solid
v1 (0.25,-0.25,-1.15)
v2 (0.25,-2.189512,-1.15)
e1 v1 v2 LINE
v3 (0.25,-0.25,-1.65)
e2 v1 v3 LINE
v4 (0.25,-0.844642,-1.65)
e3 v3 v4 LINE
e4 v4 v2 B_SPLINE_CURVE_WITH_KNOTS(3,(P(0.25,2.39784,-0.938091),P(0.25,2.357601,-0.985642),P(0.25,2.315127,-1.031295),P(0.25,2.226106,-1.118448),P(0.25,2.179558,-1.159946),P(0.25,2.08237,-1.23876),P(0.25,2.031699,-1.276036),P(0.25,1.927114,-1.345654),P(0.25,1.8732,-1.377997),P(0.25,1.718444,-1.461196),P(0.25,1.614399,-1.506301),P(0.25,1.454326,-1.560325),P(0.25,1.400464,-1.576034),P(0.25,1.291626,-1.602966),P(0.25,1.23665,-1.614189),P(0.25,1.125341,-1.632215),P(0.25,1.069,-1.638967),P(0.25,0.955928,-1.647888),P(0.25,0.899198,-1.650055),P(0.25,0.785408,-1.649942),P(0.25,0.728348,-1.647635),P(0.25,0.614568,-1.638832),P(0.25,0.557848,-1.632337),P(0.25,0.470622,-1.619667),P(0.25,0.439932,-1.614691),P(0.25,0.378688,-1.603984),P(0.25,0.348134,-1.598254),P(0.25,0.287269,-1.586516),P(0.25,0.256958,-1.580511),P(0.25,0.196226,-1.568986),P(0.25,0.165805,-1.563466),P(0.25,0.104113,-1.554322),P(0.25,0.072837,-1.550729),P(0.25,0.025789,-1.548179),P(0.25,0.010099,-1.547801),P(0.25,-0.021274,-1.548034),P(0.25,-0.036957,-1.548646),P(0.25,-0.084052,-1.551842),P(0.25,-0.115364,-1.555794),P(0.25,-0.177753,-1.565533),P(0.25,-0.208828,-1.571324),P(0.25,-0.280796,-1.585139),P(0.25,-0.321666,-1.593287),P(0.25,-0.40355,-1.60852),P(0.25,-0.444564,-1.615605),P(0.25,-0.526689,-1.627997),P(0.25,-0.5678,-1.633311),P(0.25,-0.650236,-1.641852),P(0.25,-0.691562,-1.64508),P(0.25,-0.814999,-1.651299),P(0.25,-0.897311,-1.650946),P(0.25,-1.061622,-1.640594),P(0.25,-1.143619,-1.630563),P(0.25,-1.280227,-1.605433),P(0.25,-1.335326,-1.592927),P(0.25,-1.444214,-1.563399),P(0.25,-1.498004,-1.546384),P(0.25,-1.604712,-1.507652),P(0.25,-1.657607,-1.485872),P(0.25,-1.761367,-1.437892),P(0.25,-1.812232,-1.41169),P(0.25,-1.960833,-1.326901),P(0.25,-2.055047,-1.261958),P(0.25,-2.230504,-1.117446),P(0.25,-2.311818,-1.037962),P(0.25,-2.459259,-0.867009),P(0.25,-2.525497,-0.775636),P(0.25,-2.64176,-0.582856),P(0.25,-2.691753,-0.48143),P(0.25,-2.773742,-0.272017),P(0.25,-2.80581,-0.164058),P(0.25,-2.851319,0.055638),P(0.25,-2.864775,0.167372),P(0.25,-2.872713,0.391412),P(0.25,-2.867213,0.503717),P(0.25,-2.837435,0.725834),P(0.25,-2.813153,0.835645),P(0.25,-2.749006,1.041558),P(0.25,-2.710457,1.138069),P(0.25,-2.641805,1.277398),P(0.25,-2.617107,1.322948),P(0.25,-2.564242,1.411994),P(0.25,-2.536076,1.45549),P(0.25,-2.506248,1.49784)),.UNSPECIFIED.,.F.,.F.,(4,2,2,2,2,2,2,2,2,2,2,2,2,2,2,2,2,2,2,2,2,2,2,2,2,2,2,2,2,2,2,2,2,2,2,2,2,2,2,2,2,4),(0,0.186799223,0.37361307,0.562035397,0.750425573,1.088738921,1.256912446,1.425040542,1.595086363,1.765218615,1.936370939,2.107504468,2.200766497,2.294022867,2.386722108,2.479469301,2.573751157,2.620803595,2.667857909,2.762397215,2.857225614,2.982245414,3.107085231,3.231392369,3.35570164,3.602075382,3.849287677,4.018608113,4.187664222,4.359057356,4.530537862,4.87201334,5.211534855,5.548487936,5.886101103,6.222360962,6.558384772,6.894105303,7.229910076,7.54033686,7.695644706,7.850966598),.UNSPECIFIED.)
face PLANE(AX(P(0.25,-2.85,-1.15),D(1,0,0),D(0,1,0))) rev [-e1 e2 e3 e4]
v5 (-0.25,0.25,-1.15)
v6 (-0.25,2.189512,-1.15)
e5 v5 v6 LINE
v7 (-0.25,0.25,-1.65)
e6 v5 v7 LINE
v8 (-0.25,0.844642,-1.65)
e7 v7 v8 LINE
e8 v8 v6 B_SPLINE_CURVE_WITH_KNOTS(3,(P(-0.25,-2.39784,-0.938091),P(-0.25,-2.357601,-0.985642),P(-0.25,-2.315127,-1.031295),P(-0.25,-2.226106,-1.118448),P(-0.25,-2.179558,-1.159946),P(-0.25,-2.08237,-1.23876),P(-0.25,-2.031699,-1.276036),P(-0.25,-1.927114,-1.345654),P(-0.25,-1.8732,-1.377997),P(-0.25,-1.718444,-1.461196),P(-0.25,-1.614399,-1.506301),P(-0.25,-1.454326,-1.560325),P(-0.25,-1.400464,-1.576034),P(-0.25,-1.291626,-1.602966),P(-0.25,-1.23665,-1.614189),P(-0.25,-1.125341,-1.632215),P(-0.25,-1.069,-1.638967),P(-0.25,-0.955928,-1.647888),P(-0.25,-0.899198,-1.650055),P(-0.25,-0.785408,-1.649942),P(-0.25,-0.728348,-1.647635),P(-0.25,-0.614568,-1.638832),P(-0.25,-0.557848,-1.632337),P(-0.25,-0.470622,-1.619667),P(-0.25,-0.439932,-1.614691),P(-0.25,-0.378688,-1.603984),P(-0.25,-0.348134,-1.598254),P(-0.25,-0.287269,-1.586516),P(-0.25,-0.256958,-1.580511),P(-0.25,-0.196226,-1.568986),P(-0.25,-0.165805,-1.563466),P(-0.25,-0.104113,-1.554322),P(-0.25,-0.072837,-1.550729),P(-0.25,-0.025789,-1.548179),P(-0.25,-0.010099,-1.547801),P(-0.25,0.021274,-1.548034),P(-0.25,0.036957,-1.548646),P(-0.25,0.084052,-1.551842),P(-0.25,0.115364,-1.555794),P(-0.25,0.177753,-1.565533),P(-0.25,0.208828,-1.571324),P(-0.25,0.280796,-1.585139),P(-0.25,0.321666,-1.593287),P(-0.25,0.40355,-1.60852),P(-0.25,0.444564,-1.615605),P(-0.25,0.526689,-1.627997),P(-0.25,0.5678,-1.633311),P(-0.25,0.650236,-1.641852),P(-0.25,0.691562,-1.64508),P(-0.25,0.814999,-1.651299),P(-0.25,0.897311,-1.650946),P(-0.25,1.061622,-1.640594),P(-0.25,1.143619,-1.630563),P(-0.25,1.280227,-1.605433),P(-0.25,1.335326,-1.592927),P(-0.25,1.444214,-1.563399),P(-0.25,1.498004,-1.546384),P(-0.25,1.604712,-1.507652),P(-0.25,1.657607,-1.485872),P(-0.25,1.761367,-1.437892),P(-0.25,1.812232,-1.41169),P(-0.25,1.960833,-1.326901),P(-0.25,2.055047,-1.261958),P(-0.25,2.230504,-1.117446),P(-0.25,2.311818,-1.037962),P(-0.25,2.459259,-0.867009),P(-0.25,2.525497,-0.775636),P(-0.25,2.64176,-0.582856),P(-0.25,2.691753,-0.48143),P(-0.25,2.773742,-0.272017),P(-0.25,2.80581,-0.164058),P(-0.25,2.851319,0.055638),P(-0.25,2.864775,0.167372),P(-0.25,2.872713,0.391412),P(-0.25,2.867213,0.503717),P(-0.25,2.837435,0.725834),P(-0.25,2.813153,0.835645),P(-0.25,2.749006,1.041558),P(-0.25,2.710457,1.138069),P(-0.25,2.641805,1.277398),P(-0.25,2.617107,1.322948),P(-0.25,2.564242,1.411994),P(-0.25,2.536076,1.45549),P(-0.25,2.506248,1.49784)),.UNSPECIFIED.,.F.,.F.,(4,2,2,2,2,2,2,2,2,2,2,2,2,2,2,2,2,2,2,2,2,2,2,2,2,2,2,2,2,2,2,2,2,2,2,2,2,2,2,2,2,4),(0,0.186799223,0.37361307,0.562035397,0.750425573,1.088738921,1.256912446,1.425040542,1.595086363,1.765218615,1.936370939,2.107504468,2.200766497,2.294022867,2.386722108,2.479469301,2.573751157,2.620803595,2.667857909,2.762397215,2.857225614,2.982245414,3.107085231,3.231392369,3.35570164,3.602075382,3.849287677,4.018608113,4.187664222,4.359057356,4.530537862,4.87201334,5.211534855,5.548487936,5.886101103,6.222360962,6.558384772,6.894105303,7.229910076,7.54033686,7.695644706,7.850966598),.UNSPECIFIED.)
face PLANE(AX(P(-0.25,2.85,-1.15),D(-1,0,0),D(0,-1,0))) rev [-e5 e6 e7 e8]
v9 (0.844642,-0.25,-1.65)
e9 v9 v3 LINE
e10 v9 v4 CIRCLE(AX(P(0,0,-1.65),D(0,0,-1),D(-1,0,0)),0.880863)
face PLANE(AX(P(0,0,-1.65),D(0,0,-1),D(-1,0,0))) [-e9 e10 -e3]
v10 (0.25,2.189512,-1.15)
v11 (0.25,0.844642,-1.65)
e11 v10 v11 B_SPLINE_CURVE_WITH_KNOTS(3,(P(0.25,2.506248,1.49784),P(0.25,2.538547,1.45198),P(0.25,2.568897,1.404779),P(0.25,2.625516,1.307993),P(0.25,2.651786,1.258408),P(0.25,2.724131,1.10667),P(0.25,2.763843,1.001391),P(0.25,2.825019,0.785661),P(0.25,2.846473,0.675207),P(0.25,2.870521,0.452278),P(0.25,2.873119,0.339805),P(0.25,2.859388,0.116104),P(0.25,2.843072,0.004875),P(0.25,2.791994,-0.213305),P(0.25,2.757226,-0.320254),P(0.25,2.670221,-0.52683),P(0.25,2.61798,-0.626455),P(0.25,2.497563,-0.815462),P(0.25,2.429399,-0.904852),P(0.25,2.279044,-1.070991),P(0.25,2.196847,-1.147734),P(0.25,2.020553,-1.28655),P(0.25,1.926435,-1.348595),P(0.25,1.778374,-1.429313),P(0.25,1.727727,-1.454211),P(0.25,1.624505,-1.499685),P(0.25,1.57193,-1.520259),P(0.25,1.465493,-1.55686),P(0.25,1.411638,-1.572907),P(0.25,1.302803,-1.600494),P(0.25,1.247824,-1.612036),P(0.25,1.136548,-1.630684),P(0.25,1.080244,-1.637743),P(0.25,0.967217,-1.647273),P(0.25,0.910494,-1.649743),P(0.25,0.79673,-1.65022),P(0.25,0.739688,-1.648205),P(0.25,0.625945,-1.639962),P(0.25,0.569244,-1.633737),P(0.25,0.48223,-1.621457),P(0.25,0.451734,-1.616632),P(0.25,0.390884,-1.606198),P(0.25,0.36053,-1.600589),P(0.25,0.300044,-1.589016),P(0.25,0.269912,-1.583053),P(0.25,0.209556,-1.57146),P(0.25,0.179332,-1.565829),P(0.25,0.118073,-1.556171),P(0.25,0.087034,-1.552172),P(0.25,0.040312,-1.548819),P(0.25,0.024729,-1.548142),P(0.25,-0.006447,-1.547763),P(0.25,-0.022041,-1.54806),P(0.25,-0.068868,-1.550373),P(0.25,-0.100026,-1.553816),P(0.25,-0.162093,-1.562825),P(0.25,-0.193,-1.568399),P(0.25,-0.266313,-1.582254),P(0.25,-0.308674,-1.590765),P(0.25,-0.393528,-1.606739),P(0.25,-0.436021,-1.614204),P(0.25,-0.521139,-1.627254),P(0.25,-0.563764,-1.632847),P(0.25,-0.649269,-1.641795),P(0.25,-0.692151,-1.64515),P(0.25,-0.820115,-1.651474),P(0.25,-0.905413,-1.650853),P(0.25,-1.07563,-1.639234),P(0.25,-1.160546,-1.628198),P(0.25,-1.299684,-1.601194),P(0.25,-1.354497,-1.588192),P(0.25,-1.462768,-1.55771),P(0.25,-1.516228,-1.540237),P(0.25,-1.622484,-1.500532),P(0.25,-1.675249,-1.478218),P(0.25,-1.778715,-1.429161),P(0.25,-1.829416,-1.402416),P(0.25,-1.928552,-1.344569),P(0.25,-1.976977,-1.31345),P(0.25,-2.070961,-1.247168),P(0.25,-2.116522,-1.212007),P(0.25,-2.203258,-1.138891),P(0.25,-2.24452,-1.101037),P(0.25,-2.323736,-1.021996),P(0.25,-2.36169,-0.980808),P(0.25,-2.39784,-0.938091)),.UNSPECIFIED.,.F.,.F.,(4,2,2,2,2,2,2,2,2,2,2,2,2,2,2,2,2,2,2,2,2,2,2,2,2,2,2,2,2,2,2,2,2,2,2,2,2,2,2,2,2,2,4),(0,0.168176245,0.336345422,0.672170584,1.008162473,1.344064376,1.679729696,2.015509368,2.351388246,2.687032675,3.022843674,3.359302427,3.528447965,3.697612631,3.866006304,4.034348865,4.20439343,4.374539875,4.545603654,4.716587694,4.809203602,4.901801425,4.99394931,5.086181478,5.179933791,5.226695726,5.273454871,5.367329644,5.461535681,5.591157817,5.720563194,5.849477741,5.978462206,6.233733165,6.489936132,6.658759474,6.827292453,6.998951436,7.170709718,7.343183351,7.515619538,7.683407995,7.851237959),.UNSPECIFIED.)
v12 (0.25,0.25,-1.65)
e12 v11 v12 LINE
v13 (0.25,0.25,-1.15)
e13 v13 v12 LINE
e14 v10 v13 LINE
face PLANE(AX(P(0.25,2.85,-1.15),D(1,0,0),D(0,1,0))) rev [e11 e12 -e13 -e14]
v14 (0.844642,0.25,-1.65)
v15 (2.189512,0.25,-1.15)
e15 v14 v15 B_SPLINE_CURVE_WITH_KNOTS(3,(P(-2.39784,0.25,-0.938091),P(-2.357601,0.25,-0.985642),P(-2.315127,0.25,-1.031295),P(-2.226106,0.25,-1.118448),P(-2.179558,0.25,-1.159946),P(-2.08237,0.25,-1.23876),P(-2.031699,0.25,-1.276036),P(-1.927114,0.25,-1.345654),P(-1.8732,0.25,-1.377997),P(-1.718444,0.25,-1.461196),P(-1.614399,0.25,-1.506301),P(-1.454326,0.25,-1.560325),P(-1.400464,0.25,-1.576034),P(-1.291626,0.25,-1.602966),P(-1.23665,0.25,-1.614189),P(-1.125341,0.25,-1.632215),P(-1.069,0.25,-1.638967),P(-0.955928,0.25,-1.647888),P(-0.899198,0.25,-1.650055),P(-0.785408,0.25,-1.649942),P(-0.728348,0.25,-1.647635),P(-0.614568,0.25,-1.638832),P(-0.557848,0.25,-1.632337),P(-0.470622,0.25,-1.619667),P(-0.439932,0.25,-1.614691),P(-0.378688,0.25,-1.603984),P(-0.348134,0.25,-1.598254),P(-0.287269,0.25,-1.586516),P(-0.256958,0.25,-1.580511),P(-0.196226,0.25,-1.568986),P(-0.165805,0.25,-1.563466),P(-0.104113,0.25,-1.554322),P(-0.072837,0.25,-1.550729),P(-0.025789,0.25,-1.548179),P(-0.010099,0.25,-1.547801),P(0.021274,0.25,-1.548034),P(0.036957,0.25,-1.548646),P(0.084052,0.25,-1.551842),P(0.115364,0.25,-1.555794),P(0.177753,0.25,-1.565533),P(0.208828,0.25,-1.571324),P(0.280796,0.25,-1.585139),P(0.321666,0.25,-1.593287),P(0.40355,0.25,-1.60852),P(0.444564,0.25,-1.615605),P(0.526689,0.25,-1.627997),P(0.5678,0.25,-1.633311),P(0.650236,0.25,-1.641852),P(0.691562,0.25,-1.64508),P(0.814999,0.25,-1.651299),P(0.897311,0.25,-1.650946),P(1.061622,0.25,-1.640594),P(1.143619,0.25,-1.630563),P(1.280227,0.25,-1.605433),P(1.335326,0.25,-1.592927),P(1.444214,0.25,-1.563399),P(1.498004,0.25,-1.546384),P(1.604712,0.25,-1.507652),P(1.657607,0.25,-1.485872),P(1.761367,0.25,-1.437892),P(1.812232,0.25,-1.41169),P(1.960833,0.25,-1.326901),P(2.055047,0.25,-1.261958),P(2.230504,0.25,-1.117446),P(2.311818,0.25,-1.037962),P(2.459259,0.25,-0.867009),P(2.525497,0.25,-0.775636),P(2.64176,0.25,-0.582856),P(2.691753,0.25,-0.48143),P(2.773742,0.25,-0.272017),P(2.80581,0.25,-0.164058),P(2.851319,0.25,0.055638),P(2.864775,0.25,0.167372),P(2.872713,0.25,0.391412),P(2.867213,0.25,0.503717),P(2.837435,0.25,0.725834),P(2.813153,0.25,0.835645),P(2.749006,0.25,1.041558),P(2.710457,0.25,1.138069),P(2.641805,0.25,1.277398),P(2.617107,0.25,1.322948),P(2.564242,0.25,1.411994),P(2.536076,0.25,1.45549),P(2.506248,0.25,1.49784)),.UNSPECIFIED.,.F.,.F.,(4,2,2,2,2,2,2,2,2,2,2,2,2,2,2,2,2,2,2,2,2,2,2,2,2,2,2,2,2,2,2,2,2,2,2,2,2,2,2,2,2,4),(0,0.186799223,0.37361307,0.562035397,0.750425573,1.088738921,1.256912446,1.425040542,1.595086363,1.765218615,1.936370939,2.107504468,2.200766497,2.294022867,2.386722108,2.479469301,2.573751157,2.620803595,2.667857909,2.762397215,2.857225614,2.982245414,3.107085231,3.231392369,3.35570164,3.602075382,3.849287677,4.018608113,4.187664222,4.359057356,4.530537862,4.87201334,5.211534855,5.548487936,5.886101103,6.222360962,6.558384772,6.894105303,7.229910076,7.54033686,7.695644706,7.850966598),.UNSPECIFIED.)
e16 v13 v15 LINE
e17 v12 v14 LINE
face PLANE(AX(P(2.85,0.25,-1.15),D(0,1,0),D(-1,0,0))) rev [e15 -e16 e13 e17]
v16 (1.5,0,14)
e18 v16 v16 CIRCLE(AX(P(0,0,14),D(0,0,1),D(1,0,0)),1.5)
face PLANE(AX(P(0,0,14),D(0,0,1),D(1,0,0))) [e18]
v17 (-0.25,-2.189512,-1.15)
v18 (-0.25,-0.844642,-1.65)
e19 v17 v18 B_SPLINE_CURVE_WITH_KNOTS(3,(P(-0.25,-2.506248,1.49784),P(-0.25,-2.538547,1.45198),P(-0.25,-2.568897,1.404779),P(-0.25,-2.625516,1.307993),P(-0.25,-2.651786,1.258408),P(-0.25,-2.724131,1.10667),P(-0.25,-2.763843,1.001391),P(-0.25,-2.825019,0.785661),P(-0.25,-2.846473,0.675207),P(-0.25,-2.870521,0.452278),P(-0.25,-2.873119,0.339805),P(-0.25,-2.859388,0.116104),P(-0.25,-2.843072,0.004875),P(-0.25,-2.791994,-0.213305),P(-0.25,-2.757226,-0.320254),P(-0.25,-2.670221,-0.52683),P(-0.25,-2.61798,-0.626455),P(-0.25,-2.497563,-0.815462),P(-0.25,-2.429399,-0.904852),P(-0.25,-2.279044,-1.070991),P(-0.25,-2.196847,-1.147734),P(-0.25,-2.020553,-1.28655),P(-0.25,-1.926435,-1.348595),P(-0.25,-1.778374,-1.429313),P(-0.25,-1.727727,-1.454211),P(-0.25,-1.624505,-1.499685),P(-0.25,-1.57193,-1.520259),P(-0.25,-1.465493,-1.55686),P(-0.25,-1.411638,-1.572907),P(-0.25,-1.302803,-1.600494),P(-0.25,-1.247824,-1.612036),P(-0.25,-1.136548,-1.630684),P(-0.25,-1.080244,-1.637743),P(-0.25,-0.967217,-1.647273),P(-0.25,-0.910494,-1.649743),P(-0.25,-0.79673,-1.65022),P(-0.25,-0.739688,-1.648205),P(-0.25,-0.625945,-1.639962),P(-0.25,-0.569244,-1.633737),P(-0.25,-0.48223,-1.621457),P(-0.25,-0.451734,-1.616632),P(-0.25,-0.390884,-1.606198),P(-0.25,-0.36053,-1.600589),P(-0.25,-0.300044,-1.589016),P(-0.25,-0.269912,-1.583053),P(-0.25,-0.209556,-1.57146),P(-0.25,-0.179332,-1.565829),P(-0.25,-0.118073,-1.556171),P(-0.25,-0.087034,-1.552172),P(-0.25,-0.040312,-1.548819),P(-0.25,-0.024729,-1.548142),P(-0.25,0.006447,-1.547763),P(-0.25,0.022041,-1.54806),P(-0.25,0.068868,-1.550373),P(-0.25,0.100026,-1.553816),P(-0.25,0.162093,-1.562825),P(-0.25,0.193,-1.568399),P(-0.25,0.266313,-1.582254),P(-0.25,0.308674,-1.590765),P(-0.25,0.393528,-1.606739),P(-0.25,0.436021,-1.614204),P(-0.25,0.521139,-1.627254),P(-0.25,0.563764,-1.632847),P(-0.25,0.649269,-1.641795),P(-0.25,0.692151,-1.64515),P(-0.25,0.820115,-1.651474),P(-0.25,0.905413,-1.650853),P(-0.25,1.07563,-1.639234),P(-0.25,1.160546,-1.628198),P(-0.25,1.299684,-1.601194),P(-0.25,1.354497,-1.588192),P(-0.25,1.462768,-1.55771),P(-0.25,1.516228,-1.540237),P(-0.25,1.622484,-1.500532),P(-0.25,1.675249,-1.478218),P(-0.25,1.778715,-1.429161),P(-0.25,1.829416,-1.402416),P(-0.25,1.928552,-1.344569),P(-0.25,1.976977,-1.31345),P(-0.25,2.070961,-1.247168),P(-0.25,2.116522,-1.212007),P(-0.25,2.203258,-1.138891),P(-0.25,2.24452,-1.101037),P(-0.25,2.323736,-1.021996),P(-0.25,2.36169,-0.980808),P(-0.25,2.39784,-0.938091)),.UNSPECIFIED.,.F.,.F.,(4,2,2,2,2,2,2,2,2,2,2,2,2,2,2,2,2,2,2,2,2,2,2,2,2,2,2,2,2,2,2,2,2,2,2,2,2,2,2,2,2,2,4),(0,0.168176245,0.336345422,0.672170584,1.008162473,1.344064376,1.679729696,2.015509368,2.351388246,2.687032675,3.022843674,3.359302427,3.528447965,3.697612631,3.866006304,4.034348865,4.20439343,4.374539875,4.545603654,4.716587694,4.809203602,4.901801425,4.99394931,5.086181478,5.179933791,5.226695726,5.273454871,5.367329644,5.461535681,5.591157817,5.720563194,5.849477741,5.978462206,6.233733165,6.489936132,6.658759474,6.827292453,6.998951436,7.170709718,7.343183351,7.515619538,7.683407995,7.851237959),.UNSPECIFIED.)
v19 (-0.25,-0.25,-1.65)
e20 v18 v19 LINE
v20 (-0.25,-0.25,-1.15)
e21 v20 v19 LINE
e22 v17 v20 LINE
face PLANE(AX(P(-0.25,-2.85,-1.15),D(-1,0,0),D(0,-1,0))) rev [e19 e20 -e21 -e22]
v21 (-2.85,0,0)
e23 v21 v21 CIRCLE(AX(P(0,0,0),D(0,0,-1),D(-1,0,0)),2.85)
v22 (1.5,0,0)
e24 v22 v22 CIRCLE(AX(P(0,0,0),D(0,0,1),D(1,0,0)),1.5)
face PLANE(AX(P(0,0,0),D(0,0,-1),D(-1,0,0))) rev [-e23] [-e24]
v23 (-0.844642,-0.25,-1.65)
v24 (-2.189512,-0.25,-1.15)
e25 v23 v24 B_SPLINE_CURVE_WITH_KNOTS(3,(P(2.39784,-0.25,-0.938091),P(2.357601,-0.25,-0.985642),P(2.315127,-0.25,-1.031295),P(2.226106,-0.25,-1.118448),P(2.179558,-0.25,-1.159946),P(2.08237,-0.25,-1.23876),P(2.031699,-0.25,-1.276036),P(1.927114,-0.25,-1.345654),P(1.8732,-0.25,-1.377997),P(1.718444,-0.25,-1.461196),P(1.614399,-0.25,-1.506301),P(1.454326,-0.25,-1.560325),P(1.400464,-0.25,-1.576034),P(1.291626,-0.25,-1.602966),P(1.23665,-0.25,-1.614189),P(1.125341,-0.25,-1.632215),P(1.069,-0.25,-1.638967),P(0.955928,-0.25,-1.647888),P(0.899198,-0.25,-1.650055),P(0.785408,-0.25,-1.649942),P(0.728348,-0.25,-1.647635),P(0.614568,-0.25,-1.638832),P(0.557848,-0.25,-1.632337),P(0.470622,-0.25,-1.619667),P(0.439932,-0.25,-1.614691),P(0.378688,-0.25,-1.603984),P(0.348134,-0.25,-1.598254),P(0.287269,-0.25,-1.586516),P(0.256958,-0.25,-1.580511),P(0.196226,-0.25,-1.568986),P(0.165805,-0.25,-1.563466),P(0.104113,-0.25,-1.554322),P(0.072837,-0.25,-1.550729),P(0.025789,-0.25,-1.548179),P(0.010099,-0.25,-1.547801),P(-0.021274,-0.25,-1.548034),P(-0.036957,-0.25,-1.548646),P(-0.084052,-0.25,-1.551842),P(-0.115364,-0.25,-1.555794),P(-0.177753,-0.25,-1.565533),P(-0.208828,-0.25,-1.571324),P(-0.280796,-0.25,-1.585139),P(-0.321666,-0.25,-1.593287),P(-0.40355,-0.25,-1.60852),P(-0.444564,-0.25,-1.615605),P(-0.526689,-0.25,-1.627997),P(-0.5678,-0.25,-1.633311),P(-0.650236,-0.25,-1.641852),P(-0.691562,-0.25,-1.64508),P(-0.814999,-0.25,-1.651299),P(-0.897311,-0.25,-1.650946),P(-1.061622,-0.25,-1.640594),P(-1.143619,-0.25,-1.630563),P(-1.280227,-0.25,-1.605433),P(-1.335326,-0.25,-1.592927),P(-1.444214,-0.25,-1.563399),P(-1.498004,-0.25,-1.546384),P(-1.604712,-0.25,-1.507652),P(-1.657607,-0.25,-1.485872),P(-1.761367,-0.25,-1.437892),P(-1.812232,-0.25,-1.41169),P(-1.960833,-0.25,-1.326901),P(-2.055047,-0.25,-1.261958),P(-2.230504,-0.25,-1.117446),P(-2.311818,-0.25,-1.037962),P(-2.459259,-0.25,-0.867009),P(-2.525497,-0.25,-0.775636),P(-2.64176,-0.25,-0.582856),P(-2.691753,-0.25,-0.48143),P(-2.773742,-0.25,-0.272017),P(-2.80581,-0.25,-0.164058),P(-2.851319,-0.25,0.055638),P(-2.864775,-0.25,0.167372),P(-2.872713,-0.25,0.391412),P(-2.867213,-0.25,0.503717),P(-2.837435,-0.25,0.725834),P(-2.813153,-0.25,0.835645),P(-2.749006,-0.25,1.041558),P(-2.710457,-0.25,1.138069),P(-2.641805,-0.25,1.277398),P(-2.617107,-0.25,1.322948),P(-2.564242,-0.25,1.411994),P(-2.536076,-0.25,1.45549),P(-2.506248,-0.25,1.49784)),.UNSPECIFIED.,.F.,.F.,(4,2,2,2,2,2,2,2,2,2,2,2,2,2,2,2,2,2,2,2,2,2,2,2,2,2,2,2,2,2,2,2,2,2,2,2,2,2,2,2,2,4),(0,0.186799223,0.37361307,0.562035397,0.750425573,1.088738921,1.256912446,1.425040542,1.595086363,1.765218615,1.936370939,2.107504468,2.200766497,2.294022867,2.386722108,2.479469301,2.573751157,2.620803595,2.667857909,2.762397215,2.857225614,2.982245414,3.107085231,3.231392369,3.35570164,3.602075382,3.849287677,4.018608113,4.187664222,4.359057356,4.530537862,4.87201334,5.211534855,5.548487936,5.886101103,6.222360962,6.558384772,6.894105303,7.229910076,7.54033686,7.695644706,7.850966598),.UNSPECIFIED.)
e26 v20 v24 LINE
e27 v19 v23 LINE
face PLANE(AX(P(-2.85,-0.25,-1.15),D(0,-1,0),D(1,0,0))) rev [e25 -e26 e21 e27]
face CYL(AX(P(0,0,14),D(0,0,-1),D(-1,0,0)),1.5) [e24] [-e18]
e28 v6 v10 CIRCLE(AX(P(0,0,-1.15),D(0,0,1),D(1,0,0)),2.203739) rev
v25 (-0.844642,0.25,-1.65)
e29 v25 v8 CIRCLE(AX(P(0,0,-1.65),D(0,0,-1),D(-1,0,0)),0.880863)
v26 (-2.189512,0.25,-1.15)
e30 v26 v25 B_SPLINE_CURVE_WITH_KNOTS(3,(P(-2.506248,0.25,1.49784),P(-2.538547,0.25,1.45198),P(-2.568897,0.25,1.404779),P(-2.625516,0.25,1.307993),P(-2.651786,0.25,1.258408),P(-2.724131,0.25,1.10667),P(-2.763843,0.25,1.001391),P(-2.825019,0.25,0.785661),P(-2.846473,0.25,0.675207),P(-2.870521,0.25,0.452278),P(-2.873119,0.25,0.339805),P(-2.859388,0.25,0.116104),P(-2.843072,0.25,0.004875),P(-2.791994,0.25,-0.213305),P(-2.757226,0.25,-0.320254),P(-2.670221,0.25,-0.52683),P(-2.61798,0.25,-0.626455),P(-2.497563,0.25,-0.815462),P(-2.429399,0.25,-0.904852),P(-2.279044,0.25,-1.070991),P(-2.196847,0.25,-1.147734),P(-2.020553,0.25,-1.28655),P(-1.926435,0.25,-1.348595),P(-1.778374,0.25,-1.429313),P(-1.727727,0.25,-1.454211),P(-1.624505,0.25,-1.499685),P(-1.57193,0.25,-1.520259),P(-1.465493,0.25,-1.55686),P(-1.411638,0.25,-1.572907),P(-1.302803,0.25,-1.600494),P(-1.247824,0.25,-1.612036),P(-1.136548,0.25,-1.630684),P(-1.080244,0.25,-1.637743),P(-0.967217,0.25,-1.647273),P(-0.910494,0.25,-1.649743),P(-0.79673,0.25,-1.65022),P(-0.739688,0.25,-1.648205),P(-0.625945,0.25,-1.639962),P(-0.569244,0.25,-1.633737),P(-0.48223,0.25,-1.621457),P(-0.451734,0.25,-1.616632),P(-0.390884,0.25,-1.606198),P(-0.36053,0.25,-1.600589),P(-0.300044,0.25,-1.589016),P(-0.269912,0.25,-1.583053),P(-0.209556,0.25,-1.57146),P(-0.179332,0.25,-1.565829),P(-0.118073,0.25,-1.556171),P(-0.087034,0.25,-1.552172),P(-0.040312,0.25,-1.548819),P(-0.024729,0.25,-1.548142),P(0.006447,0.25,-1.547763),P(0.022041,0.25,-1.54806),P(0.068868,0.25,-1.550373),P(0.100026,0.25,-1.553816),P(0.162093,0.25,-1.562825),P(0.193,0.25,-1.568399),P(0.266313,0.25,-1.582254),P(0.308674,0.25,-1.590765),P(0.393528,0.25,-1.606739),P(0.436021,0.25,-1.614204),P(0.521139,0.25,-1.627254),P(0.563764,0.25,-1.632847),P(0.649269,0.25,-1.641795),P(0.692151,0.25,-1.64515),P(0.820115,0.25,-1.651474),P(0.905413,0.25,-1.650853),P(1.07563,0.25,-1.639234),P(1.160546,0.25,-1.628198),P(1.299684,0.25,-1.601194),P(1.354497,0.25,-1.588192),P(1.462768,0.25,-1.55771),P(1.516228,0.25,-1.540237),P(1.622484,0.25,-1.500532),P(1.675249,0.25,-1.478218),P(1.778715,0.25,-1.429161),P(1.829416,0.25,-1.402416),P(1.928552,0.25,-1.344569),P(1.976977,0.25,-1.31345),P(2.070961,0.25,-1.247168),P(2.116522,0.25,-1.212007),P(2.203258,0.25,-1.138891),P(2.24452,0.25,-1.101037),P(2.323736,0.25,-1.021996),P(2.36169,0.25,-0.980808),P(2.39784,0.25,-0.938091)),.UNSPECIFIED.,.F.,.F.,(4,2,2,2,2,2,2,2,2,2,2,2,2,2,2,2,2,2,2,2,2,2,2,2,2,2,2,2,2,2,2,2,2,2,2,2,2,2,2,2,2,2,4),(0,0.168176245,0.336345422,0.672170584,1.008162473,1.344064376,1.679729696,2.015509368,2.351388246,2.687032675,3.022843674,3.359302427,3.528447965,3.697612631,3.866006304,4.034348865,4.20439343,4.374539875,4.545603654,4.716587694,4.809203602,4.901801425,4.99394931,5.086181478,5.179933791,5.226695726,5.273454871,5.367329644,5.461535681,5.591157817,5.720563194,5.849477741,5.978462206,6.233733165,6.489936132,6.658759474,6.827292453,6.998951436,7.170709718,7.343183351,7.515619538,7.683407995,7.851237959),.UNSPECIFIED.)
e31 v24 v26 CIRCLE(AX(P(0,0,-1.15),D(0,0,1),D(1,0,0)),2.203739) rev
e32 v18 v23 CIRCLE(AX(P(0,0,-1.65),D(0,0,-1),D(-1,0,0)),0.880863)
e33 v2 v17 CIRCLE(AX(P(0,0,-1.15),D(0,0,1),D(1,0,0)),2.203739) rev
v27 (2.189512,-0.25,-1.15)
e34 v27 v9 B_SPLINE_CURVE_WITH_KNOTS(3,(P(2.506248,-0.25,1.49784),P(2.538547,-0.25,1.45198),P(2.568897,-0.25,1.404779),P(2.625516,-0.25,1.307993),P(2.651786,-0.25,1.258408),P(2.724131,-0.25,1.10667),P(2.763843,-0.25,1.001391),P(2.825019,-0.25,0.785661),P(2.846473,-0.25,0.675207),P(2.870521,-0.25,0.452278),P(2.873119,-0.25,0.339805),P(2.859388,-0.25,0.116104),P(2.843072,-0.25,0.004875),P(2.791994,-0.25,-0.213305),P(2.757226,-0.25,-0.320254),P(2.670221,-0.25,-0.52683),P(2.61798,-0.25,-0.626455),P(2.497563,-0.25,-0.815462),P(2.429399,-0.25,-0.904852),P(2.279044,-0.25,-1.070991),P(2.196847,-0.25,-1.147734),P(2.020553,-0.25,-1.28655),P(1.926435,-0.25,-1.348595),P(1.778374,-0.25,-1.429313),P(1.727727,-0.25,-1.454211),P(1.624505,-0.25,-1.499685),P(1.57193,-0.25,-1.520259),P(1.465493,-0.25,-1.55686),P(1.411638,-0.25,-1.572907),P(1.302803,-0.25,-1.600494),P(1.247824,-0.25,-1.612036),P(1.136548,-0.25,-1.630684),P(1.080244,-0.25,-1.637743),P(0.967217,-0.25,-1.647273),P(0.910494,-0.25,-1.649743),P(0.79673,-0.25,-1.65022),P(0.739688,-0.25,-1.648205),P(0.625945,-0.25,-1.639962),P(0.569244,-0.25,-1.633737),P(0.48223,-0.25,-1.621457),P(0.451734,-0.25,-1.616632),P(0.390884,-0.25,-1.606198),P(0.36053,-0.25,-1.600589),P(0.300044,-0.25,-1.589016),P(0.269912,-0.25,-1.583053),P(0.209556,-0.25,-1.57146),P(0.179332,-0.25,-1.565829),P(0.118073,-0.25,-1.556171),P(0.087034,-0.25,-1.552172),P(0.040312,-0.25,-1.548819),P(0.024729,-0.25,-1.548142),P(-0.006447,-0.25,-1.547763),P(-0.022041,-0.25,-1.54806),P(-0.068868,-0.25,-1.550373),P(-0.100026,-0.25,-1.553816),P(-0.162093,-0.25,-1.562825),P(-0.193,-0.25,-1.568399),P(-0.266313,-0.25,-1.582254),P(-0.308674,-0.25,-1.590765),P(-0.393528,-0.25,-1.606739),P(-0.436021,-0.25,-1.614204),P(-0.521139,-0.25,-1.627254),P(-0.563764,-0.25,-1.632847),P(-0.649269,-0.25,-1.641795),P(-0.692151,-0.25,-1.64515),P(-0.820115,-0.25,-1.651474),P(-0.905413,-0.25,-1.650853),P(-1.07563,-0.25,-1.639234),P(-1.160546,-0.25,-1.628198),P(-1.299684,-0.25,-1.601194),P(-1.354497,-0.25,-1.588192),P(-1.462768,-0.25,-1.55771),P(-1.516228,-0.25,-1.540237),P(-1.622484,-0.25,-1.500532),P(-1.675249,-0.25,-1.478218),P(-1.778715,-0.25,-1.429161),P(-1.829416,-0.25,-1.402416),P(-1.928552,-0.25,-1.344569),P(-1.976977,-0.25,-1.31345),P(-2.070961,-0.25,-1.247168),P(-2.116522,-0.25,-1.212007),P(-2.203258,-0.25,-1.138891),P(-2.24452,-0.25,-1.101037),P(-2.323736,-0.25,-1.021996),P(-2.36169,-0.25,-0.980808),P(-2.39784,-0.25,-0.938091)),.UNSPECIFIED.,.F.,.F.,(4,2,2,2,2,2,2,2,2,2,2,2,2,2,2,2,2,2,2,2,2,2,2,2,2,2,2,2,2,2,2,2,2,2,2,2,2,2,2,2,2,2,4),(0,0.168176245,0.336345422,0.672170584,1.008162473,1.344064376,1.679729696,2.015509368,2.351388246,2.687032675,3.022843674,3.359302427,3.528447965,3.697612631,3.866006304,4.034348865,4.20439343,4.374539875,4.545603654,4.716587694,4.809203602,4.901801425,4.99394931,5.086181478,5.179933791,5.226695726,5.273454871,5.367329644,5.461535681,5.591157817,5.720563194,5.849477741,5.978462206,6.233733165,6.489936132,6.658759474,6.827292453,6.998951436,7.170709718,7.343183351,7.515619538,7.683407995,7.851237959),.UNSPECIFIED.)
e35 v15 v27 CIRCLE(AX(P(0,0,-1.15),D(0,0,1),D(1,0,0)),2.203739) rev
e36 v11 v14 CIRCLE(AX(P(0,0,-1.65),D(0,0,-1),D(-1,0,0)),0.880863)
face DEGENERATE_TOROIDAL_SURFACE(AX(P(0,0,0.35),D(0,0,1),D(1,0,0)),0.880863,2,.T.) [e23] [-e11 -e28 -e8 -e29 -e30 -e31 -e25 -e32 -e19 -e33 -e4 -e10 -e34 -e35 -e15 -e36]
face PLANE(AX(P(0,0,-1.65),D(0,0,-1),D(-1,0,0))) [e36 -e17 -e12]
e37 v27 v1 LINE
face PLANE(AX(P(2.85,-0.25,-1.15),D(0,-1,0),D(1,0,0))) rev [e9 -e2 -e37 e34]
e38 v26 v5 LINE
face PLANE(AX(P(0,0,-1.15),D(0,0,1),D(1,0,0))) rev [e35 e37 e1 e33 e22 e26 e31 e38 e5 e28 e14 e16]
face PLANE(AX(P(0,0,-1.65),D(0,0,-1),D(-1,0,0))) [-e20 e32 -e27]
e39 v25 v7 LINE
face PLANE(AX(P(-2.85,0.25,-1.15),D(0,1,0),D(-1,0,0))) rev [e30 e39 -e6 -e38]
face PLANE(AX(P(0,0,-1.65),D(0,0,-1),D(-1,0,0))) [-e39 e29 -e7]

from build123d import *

# Parameters (mm, degrees)
SKETCH_1_R          = 1.5
EXTRUDE_1_DEPTH     = 14
SKETCH_2_R          = 2.85
EXTRUDE_2_DEPTH     = 1.65
FILLET_1_R          = 2
CUT_EXTRUDE_1_DEPTH = 0.5


with BuildPart() as part:
    # 草图1 → 凸台-拉伸1 (new body)
    with BuildSketch(Plane.XY):
        Circle(SKETCH_1_R)
    extrude(amount=EXTRUDE_1_DEPTH)

    # 草图2 → 凸台-拉伸2 (add)
    with BuildSketch(Plane(origin=(0, 0, 0), x_dir=(-1, 0, 0), z_dir=(0, 0, -1))):
        Circle(SKETCH_2_R)
    extrude(amount=EXTRUDE_2_DEPTH)

    # 圆角1
    # the kernel refuses this fillet: 2 mm, written as the material it takes off along each edge
    with BuildSketch(Plane(origin=(0, 0, -1.65), x_dir=(-1, 0, 0), z_dir=(0, -1, 0))) as fillet_1_piece_1:
        with BuildLine():
            CenterArc((0.880863133, -2), FILLET_1_R, 10.078658108, 79.921341892)
            Line((0.880863133, 0), (0.880863133, 0.04))
            Line((0.880863133, 0.04), (2.85, 0.04))
            Line((2.85, 0.04), (2.89, 0))
            ThreePointArc((2.89, 0), (2.89, -0.825), (2.889382737, -1.643))
            Line((2.889382737, -1.643), (2.85, -1.65))
        make_face()
    revolve(axis=Axis((0, 0, -1.65), (0, 0, -1)), mode=Mode.SUBTRACT)

    # 草图3 → 切除-拉伸1 (cut)
    with BuildSketch(Plane(origin=(0, 0, -1.65), x_dir=(-1, 0, 0), z_dir=(0, 0, -1))):
        Polygon((2.85, 0.25), (2.85, -0.25), (0.25, -0.25), (0.25, -2.85), (-0.25, -2.85), (-0.25, -0.25), (-2.85, -0.25), (-2.85, 0.25), (-0.25, 0.25), (-0.25, 2.85), (0.25, 2.85), (0.25, 0.25), align=None)
    extrude(amount=-CUT_EXTRUDE_1_DEPTH, mode=Mode.SUBTRACT)


solid = part.part
